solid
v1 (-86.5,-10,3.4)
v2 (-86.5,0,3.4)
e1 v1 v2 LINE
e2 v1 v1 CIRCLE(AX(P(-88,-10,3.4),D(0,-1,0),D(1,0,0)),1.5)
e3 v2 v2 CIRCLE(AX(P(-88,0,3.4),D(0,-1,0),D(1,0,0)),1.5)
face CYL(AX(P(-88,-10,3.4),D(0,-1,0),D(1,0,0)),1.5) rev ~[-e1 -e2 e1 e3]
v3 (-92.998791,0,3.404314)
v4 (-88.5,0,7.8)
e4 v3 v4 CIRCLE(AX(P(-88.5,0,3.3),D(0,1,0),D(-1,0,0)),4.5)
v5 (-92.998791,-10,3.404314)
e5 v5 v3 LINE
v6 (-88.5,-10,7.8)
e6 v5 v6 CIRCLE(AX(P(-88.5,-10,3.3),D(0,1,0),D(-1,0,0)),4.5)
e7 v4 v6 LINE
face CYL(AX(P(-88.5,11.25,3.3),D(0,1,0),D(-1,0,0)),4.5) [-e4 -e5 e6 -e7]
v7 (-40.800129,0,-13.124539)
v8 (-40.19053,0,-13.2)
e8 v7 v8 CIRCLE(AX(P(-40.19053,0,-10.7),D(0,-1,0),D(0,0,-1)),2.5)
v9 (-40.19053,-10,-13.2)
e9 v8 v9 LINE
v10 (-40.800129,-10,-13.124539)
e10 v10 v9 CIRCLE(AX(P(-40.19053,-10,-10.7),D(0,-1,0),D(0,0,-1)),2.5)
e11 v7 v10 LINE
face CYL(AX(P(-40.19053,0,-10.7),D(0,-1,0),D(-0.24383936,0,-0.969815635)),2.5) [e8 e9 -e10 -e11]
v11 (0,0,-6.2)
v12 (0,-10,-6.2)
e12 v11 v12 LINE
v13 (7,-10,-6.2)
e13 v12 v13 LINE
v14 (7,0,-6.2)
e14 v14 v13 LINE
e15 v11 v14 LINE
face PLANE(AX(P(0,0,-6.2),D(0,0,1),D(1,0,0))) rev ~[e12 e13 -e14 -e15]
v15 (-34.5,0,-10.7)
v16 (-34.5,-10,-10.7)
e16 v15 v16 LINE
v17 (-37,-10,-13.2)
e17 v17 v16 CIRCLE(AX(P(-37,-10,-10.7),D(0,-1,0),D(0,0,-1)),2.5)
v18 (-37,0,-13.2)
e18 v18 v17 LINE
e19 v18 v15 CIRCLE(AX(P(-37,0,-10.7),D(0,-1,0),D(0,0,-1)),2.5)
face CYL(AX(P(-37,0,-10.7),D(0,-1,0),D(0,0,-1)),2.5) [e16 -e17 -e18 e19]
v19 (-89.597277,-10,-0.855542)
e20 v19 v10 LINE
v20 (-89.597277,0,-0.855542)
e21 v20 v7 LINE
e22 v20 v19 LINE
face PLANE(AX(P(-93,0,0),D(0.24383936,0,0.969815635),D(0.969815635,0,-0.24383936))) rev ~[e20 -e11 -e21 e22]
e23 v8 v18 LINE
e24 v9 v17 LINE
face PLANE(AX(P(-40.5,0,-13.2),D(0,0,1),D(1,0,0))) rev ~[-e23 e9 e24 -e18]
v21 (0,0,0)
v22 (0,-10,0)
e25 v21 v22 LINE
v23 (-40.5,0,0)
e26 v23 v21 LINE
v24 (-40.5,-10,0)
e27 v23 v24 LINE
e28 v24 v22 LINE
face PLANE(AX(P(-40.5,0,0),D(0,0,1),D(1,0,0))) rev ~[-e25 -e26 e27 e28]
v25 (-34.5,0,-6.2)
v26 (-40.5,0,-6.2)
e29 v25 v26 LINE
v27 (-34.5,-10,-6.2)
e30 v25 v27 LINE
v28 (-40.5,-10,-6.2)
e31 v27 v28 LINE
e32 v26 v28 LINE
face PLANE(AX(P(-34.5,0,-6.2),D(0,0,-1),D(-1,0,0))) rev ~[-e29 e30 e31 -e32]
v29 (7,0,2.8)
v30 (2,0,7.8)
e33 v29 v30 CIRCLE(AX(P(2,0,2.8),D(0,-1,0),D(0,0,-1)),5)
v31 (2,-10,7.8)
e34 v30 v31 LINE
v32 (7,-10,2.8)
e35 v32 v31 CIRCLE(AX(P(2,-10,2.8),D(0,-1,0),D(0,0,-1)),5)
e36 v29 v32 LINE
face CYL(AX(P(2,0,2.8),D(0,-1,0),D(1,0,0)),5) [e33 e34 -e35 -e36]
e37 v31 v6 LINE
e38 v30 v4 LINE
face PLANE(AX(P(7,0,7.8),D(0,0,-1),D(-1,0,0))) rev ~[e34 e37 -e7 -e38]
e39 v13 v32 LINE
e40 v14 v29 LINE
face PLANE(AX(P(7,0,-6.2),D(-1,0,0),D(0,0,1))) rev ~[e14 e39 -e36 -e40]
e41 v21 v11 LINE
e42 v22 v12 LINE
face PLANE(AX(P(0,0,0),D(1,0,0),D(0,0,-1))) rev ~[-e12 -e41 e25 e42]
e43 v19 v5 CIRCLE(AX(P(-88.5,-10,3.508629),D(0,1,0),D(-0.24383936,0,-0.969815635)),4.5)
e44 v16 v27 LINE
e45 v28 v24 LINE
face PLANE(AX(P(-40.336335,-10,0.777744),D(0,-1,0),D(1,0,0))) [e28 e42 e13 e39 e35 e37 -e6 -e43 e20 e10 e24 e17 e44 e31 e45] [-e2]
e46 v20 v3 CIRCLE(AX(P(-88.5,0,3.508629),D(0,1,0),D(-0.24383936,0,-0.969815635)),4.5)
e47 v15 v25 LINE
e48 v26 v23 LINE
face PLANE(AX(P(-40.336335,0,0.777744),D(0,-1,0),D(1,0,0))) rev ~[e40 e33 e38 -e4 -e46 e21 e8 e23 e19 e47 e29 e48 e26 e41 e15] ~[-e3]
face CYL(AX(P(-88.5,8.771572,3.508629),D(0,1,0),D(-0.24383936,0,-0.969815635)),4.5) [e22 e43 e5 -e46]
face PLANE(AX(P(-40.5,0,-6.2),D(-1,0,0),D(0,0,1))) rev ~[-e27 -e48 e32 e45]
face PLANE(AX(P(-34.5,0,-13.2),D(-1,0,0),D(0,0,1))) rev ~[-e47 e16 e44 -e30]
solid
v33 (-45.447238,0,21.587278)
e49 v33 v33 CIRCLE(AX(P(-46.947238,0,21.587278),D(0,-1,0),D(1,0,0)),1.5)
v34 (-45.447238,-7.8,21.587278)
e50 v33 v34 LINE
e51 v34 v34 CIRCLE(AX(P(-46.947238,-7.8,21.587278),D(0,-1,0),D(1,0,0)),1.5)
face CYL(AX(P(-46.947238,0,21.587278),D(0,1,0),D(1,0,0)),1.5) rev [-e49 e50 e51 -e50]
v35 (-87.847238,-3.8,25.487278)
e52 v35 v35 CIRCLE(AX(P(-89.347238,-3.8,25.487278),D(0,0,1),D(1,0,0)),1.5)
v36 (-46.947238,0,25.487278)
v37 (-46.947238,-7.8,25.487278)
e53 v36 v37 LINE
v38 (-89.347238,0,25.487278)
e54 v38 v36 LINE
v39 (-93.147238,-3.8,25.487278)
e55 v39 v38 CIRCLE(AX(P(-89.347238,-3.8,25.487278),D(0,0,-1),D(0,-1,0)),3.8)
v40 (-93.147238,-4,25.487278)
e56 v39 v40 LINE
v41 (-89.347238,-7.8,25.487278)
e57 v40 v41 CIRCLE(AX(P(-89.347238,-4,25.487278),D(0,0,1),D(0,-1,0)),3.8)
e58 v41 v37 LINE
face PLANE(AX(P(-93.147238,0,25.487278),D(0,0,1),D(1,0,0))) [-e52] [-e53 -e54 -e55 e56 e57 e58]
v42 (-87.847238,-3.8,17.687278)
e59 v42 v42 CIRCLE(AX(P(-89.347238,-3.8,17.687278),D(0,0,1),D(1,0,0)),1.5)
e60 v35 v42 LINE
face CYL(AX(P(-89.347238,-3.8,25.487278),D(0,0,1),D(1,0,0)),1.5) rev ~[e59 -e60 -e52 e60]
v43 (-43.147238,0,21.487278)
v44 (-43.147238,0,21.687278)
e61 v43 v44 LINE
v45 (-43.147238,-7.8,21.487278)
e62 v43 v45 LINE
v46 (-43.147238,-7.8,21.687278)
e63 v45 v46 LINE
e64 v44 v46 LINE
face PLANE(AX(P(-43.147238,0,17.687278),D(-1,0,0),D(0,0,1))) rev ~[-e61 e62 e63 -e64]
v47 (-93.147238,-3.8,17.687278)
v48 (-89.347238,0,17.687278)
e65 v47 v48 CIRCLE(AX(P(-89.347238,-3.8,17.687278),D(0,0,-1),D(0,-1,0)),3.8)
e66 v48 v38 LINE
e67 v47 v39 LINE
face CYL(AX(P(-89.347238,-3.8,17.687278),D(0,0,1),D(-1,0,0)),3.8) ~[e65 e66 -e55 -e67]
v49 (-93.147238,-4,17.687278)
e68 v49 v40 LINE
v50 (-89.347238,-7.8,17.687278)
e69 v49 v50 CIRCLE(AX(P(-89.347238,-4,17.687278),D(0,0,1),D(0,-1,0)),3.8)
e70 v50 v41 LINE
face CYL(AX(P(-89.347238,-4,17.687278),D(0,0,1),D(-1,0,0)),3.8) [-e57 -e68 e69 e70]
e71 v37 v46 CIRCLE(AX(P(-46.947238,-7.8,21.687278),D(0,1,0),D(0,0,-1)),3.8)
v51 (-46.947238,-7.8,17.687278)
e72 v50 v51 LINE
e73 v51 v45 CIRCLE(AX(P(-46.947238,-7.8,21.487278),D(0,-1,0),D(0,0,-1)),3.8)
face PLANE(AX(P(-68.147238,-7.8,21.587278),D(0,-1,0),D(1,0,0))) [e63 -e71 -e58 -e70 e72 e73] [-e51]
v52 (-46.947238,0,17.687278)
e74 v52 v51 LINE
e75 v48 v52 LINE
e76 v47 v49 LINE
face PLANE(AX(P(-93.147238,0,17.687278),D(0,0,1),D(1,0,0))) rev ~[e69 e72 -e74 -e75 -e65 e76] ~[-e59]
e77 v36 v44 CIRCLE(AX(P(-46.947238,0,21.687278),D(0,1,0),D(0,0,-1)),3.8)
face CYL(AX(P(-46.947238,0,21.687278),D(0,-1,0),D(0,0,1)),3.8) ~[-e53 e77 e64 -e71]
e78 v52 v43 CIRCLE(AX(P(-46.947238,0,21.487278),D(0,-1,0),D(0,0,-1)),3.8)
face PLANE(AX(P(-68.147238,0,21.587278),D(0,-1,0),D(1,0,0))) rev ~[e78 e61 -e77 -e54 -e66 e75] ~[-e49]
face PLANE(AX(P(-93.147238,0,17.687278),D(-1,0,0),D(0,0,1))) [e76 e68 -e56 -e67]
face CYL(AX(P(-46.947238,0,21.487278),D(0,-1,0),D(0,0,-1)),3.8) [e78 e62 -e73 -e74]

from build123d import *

# Parameters (mm, degrees)
F1_DEPTH    = 10
F2_R        = 5
F3_R        = 2.5
F4_T1_DEPTH = 27.5431430313
F4_T3_DEPTH = 32.5
F5_R        = 1.5
F6_DEPTH    = 25
F7_W        = 50
F7_H        = 7.8
F7_R        = 1.5
F8_DEPTH    = 7.8
F9_R        = 3.8
F10_R       = 1.5
F11_DEPTH   = 25


# Not quite as in the source:
# - a fillet or chamfer that OpenCascade refuses, or shapes differently, is made with other operations: its cross-section is extruded or revolved along the edge and cut away or added


with BuildPart() as f1:
    # F0 (on Front) → F1 (new body)
    with BuildSketch(Plane.XZ):
        Polygon((-40.5, 0), (0, 0), (0, -6.2), (7, -6.2), (7, 7.8), (-93, 7.8), (-93, 0), (-40.5, -13.2), (-34.5, -13.2), (-34.5, -6.2), (-40.5, -6.2), align=None)
    extrude(amount=F1_DEPTH)

    # F2
    f2_edges = [f1.edges().sort_by_distance(p)[0] for p in [
        (7, -5, 7.8),
    ]]
    fillet(f2_edges, radius=F2_R)

    # F3
    f3_edges = [f1.edges().sort_by_distance(p)[0] for p in [
        (-34.5, -5, -13.2),
        (-40.5, -5, -13.2),
    ]]
    fillet(f3_edges, radius=F3_R)

    # F4: fillet of radius 4.5 on 2 edges, made by hand

    # F4_s2 → F4_t1 (cut)
    with BuildSketch(Plane.XZ.offset(-8.7715715157)):
        with BuildLine():
            ThreePointArc((-89.5972771189, -0.855541753), (-92.0487847945, 0.7416579735), (-93, 3.5086286063))
            Line((-93, 3.5086286063), (-93, 0))
            Line((-93, 0), (-89.5972771189, -0.855541753))
        make_face()
    extrude(amount=F4_T1_DEPTH, mode=Mode.SUBTRACT)

    # F4_s4 → F4_t3 (cut)
    with BuildSketch(Plane.XZ.offset(-11.25)):
        with BuildLine():
            ThreePointArc((-93, 3.3), (-91.6819805153, 6.4819805153), (-88.5, 7.8))
            Line((-88.5, 7.8), (-93, 7.8))
            Line((-93, 7.8), (-93, 3.3))
        make_face()
    extrude(amount=F4_T3_DEPTH, mode=Mode.SUBTRACT)

    # F5 (on face) → F6 (cut)
    with BuildSketch(Plane.XZ.offset(10)):
        with Locations((-88, 3.4)):
            Circle(F5_R)
    extrude(amount=-F6_DEPTH, mode=Mode.SUBTRACT)


with BuildPart() as f8:
    # F7 (on Front) → F8 (new body)
    with BuildSketch(Plane.XZ):
        with Locations((-68.1472382043, 21.5872781662)):
            Rectangle(F7_W, F7_H)
        with Locations((-46.9472382043, 21.5872781662)):
            Circle(F7_R, mode=Mode.SUBTRACT)
    extrude(amount=F8_DEPTH)

    # F9
    f9_edges = [f8.edges().sort_by_distance(p)[0] for p in [
        (-43.147238, -3.9, 25.487278),
        (-43.147238, -3.9, 17.687278),
        (-93.147238, -7.8, 21.587278),
        (-93.147238, 0, 21.587278),
    ]]
    fillet(f9_edges, radius=F9_R)

    # F10 (on face) → F11 (cut)
    with BuildSketch(Plane.XY.offset(25.4872781662)):
        with Locations((-89.3472382043, -3.8)):
            Circle(F10_R)
    extrude(amount=-F11_DEPTH, mode=Mode.SUBTRACT)


solid = Compound([f1.part, f8.part])
